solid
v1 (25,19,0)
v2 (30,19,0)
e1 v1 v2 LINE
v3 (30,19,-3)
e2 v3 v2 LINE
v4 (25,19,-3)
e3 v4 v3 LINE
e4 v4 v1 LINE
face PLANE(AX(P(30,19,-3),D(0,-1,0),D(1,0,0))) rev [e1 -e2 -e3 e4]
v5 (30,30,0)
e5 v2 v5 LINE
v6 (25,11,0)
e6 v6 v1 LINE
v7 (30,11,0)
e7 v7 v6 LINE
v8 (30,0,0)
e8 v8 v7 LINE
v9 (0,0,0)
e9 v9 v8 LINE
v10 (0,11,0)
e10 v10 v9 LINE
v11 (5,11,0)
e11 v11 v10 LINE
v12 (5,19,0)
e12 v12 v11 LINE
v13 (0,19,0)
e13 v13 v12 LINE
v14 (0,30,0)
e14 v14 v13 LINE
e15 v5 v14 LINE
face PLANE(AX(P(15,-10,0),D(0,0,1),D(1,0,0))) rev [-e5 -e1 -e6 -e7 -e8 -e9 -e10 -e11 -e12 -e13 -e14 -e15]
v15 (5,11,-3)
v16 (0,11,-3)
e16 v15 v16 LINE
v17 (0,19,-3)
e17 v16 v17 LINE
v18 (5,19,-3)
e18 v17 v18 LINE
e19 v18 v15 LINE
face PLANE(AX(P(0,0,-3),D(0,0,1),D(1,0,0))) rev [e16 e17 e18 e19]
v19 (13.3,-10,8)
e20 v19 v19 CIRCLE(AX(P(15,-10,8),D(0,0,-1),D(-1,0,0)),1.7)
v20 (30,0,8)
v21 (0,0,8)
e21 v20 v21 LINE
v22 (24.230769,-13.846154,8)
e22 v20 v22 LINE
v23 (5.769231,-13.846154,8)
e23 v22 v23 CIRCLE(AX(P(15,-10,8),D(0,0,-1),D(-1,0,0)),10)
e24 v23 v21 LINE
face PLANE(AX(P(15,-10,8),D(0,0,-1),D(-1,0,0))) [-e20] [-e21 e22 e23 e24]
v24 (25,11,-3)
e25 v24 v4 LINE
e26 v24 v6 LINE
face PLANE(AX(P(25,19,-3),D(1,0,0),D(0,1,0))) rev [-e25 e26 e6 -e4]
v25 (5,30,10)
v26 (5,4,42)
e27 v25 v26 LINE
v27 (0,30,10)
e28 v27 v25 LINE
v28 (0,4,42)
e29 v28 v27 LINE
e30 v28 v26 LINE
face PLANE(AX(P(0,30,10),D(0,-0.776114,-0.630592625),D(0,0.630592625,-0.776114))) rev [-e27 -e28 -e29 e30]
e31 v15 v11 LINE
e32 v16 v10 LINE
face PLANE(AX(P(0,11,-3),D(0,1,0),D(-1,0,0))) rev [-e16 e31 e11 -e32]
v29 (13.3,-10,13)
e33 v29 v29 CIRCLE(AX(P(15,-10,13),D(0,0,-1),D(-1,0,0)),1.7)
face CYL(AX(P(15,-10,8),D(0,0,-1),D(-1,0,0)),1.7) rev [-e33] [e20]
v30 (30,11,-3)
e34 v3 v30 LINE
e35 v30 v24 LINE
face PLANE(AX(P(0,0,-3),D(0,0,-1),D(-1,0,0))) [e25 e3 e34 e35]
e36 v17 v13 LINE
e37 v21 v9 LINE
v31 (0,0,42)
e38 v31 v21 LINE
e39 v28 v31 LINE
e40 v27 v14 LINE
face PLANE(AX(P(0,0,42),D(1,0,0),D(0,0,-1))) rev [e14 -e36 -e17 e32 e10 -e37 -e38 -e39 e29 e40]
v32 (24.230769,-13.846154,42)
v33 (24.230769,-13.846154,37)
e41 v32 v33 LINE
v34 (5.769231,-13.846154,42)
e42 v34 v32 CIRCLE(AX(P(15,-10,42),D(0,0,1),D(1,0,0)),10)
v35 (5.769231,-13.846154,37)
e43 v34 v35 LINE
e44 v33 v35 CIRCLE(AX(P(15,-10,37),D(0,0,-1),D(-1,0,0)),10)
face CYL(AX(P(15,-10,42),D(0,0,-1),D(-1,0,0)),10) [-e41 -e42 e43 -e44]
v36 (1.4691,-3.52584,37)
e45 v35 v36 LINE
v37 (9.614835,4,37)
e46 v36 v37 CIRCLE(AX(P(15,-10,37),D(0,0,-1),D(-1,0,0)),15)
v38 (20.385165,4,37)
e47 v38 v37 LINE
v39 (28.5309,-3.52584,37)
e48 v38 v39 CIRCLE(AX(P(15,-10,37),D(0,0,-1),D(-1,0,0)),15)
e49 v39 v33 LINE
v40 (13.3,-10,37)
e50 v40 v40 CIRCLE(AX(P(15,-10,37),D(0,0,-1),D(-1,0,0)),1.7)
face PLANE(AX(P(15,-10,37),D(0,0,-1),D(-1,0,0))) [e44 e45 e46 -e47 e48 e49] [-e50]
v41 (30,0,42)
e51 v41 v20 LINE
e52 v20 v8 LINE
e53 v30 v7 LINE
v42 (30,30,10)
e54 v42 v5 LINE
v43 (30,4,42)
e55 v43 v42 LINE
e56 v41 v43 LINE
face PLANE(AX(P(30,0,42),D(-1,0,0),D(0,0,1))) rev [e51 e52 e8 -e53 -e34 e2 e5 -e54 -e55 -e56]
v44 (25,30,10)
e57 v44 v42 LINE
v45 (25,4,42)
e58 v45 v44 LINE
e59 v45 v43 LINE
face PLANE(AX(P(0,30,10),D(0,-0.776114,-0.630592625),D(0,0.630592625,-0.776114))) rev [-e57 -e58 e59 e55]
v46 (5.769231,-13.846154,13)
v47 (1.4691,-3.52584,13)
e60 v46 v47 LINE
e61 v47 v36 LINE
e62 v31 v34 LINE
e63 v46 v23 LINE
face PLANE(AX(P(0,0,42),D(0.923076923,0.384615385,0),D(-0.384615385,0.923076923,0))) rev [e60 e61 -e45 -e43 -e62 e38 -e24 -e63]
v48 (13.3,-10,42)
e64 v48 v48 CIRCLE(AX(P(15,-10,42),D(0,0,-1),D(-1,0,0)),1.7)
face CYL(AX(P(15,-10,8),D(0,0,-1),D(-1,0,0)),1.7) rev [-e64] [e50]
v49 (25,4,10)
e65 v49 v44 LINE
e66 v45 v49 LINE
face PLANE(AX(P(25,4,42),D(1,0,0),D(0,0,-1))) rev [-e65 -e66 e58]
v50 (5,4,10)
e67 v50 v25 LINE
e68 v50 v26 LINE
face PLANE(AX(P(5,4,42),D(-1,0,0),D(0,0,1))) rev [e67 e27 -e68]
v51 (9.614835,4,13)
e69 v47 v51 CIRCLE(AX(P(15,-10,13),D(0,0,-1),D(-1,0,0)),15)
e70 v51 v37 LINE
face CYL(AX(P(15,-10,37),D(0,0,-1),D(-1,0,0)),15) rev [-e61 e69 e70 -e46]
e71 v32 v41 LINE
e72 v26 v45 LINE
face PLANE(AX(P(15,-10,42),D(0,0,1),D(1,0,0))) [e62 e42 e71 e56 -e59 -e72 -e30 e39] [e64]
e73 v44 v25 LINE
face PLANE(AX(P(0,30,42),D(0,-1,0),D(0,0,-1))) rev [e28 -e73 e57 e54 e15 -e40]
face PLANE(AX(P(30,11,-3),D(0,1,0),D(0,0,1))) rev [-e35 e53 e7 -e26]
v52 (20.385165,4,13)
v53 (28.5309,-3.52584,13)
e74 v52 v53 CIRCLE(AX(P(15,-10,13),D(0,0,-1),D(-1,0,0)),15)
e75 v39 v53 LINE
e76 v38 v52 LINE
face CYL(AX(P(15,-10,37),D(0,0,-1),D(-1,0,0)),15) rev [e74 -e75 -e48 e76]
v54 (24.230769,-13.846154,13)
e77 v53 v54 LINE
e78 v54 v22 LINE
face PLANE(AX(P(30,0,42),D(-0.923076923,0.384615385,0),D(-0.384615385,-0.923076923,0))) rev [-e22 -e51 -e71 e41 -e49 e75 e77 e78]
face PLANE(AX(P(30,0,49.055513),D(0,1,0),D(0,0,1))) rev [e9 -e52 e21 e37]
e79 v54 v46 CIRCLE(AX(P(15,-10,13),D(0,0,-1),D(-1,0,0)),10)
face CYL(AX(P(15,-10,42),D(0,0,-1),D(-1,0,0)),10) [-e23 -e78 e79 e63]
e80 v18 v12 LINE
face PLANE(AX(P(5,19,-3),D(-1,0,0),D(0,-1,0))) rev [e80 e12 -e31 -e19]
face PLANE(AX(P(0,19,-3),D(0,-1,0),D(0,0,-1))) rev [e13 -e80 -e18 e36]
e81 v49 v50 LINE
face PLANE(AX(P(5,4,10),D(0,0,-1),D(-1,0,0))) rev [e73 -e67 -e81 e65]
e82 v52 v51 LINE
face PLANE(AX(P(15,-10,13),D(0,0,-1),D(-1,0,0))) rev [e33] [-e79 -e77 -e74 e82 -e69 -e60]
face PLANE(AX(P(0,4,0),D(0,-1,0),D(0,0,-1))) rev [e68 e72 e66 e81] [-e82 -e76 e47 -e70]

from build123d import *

# Parameters (mm, degrees)
EXTRUDE_1_DEPTH     = 42
SKETCH_2_R          = 15
CUT_EXTRUDE_1_DEPTH = 12
SKETCH_3_W          = 30
SKETCH_3_H          = 20
CUT_EXTRUDE_2_DEPTH = 8
SKETCH_4_W          = 5
SKETCH_4_H          = 8
EXTRUDE_2_DEPTH     = 3
OTHER_START         = 8
OTHER_1_OUTLINE_R   = 1.7
OTHER_1_DEPTH       = 34
SKETCH_7_W          = 20
SKETCH_7_H          = 32
CUT_EXTRUDE_6_DEPTH = 26
CUT_EXTRUDE_7_DEPTH = 60.699246226


# Read off the part's stored shape, not the designer's step: 高级异型孔1
with BuildPart() as part:
    # 草图1 → 凸台-拉伸1 (new body)
    with BuildSketch(Plane.XY):
        with BuildLine():
            Line((0, 0), (5.769230769, -13.846153846))
            ThreePointArc((5.769230769, -13.846153846), (15, -20), (24.230769231, -13.846153846))
            Line((24.230769231, -13.846153846), (30, 0))
            Line((30, 0), (30, 30))
            Line((30, 30), (0, 30))
            Line((0, 30), (0, 0))
        make_face()
    extrude(amount=EXTRUDE_1_DEPTH)

    # 草图2 → 切除-拉伸1 (cut, symmetric)
    with BuildSketch(Plane(origin=(0, 0, 25), x_dir=(-1, 0, 0), z_dir=(0, 0, -1))):
        with Locations((-15, -10)):
            Circle(SKETCH_2_R)
    extrude(amount=CUT_EXTRUDE_1_DEPTH, both=True, mode=Mode.SUBTRACT)

    # 草图3 → 切除-拉伸2 (cut)
    with BuildSketch(Plane(origin=(0, 0, 0), x_dir=(-1, 0, 0), z_dir=(0, 0, -1))):
        with Locations((-15, -10)):
            Rectangle(SKETCH_3_W, SKETCH_3_H)
    extrude(amount=-CUT_EXTRUDE_2_DEPTH, mode=Mode.SUBTRACT)

    # 草图4 → 凸台-拉伸2 (add)
    with BuildSketch(Plane(origin=(0, 0, 0), x_dir=(-1, 0, 0), z_dir=(0, 0, -1))):
        with Locations((-27.5, 15)):
            Rectangle(SKETCH_4_W, SKETCH_4_H)
        with Locations((-2.5, 15)):
            Rectangle(SKETCH_4_W, SKETCH_4_H)
    extrude(amount=EXTRUDE_2_DEPTH)

    # 高级异型孔1 outline → 高级异型孔1 (cut)
    with BuildSketch(Plane.XY.offset(OTHER_START)):
        with Locations((15, -10)):
            Circle(OTHER_1_OUTLINE_R)
    extrude(amount=OTHER_1_DEPTH, mode=Mode.SUBTRACT)

    # 草图7 → 切除-拉伸6 (cut)
    with BuildSketch(Plane(origin=(0, 30, 0), x_dir=(1, 0, 0), z_dir=(0, 1, 0))):
        with Locations((15, -26)):
            Rectangle(SKETCH_7_W, SKETCH_7_H)
    extrude(amount=-CUT_EXTRUDE_6_DEPTH, mode=Mode.SUBTRACT)

    # 草图8 → 切除-拉伸7 (cut, through all)
    with BuildSketch(Plane(origin=(30, 0, 0), x_dir=(0, 0, -1), z_dir=(1, 0, 0))):
        Polygon((-42, 30), (-10, 30), (-42, 4), align=None)
    extrude(amount=-CUT_EXTRUDE_7_DEPTH, mode=Mode.SUBTRACT)


solid = part.part
